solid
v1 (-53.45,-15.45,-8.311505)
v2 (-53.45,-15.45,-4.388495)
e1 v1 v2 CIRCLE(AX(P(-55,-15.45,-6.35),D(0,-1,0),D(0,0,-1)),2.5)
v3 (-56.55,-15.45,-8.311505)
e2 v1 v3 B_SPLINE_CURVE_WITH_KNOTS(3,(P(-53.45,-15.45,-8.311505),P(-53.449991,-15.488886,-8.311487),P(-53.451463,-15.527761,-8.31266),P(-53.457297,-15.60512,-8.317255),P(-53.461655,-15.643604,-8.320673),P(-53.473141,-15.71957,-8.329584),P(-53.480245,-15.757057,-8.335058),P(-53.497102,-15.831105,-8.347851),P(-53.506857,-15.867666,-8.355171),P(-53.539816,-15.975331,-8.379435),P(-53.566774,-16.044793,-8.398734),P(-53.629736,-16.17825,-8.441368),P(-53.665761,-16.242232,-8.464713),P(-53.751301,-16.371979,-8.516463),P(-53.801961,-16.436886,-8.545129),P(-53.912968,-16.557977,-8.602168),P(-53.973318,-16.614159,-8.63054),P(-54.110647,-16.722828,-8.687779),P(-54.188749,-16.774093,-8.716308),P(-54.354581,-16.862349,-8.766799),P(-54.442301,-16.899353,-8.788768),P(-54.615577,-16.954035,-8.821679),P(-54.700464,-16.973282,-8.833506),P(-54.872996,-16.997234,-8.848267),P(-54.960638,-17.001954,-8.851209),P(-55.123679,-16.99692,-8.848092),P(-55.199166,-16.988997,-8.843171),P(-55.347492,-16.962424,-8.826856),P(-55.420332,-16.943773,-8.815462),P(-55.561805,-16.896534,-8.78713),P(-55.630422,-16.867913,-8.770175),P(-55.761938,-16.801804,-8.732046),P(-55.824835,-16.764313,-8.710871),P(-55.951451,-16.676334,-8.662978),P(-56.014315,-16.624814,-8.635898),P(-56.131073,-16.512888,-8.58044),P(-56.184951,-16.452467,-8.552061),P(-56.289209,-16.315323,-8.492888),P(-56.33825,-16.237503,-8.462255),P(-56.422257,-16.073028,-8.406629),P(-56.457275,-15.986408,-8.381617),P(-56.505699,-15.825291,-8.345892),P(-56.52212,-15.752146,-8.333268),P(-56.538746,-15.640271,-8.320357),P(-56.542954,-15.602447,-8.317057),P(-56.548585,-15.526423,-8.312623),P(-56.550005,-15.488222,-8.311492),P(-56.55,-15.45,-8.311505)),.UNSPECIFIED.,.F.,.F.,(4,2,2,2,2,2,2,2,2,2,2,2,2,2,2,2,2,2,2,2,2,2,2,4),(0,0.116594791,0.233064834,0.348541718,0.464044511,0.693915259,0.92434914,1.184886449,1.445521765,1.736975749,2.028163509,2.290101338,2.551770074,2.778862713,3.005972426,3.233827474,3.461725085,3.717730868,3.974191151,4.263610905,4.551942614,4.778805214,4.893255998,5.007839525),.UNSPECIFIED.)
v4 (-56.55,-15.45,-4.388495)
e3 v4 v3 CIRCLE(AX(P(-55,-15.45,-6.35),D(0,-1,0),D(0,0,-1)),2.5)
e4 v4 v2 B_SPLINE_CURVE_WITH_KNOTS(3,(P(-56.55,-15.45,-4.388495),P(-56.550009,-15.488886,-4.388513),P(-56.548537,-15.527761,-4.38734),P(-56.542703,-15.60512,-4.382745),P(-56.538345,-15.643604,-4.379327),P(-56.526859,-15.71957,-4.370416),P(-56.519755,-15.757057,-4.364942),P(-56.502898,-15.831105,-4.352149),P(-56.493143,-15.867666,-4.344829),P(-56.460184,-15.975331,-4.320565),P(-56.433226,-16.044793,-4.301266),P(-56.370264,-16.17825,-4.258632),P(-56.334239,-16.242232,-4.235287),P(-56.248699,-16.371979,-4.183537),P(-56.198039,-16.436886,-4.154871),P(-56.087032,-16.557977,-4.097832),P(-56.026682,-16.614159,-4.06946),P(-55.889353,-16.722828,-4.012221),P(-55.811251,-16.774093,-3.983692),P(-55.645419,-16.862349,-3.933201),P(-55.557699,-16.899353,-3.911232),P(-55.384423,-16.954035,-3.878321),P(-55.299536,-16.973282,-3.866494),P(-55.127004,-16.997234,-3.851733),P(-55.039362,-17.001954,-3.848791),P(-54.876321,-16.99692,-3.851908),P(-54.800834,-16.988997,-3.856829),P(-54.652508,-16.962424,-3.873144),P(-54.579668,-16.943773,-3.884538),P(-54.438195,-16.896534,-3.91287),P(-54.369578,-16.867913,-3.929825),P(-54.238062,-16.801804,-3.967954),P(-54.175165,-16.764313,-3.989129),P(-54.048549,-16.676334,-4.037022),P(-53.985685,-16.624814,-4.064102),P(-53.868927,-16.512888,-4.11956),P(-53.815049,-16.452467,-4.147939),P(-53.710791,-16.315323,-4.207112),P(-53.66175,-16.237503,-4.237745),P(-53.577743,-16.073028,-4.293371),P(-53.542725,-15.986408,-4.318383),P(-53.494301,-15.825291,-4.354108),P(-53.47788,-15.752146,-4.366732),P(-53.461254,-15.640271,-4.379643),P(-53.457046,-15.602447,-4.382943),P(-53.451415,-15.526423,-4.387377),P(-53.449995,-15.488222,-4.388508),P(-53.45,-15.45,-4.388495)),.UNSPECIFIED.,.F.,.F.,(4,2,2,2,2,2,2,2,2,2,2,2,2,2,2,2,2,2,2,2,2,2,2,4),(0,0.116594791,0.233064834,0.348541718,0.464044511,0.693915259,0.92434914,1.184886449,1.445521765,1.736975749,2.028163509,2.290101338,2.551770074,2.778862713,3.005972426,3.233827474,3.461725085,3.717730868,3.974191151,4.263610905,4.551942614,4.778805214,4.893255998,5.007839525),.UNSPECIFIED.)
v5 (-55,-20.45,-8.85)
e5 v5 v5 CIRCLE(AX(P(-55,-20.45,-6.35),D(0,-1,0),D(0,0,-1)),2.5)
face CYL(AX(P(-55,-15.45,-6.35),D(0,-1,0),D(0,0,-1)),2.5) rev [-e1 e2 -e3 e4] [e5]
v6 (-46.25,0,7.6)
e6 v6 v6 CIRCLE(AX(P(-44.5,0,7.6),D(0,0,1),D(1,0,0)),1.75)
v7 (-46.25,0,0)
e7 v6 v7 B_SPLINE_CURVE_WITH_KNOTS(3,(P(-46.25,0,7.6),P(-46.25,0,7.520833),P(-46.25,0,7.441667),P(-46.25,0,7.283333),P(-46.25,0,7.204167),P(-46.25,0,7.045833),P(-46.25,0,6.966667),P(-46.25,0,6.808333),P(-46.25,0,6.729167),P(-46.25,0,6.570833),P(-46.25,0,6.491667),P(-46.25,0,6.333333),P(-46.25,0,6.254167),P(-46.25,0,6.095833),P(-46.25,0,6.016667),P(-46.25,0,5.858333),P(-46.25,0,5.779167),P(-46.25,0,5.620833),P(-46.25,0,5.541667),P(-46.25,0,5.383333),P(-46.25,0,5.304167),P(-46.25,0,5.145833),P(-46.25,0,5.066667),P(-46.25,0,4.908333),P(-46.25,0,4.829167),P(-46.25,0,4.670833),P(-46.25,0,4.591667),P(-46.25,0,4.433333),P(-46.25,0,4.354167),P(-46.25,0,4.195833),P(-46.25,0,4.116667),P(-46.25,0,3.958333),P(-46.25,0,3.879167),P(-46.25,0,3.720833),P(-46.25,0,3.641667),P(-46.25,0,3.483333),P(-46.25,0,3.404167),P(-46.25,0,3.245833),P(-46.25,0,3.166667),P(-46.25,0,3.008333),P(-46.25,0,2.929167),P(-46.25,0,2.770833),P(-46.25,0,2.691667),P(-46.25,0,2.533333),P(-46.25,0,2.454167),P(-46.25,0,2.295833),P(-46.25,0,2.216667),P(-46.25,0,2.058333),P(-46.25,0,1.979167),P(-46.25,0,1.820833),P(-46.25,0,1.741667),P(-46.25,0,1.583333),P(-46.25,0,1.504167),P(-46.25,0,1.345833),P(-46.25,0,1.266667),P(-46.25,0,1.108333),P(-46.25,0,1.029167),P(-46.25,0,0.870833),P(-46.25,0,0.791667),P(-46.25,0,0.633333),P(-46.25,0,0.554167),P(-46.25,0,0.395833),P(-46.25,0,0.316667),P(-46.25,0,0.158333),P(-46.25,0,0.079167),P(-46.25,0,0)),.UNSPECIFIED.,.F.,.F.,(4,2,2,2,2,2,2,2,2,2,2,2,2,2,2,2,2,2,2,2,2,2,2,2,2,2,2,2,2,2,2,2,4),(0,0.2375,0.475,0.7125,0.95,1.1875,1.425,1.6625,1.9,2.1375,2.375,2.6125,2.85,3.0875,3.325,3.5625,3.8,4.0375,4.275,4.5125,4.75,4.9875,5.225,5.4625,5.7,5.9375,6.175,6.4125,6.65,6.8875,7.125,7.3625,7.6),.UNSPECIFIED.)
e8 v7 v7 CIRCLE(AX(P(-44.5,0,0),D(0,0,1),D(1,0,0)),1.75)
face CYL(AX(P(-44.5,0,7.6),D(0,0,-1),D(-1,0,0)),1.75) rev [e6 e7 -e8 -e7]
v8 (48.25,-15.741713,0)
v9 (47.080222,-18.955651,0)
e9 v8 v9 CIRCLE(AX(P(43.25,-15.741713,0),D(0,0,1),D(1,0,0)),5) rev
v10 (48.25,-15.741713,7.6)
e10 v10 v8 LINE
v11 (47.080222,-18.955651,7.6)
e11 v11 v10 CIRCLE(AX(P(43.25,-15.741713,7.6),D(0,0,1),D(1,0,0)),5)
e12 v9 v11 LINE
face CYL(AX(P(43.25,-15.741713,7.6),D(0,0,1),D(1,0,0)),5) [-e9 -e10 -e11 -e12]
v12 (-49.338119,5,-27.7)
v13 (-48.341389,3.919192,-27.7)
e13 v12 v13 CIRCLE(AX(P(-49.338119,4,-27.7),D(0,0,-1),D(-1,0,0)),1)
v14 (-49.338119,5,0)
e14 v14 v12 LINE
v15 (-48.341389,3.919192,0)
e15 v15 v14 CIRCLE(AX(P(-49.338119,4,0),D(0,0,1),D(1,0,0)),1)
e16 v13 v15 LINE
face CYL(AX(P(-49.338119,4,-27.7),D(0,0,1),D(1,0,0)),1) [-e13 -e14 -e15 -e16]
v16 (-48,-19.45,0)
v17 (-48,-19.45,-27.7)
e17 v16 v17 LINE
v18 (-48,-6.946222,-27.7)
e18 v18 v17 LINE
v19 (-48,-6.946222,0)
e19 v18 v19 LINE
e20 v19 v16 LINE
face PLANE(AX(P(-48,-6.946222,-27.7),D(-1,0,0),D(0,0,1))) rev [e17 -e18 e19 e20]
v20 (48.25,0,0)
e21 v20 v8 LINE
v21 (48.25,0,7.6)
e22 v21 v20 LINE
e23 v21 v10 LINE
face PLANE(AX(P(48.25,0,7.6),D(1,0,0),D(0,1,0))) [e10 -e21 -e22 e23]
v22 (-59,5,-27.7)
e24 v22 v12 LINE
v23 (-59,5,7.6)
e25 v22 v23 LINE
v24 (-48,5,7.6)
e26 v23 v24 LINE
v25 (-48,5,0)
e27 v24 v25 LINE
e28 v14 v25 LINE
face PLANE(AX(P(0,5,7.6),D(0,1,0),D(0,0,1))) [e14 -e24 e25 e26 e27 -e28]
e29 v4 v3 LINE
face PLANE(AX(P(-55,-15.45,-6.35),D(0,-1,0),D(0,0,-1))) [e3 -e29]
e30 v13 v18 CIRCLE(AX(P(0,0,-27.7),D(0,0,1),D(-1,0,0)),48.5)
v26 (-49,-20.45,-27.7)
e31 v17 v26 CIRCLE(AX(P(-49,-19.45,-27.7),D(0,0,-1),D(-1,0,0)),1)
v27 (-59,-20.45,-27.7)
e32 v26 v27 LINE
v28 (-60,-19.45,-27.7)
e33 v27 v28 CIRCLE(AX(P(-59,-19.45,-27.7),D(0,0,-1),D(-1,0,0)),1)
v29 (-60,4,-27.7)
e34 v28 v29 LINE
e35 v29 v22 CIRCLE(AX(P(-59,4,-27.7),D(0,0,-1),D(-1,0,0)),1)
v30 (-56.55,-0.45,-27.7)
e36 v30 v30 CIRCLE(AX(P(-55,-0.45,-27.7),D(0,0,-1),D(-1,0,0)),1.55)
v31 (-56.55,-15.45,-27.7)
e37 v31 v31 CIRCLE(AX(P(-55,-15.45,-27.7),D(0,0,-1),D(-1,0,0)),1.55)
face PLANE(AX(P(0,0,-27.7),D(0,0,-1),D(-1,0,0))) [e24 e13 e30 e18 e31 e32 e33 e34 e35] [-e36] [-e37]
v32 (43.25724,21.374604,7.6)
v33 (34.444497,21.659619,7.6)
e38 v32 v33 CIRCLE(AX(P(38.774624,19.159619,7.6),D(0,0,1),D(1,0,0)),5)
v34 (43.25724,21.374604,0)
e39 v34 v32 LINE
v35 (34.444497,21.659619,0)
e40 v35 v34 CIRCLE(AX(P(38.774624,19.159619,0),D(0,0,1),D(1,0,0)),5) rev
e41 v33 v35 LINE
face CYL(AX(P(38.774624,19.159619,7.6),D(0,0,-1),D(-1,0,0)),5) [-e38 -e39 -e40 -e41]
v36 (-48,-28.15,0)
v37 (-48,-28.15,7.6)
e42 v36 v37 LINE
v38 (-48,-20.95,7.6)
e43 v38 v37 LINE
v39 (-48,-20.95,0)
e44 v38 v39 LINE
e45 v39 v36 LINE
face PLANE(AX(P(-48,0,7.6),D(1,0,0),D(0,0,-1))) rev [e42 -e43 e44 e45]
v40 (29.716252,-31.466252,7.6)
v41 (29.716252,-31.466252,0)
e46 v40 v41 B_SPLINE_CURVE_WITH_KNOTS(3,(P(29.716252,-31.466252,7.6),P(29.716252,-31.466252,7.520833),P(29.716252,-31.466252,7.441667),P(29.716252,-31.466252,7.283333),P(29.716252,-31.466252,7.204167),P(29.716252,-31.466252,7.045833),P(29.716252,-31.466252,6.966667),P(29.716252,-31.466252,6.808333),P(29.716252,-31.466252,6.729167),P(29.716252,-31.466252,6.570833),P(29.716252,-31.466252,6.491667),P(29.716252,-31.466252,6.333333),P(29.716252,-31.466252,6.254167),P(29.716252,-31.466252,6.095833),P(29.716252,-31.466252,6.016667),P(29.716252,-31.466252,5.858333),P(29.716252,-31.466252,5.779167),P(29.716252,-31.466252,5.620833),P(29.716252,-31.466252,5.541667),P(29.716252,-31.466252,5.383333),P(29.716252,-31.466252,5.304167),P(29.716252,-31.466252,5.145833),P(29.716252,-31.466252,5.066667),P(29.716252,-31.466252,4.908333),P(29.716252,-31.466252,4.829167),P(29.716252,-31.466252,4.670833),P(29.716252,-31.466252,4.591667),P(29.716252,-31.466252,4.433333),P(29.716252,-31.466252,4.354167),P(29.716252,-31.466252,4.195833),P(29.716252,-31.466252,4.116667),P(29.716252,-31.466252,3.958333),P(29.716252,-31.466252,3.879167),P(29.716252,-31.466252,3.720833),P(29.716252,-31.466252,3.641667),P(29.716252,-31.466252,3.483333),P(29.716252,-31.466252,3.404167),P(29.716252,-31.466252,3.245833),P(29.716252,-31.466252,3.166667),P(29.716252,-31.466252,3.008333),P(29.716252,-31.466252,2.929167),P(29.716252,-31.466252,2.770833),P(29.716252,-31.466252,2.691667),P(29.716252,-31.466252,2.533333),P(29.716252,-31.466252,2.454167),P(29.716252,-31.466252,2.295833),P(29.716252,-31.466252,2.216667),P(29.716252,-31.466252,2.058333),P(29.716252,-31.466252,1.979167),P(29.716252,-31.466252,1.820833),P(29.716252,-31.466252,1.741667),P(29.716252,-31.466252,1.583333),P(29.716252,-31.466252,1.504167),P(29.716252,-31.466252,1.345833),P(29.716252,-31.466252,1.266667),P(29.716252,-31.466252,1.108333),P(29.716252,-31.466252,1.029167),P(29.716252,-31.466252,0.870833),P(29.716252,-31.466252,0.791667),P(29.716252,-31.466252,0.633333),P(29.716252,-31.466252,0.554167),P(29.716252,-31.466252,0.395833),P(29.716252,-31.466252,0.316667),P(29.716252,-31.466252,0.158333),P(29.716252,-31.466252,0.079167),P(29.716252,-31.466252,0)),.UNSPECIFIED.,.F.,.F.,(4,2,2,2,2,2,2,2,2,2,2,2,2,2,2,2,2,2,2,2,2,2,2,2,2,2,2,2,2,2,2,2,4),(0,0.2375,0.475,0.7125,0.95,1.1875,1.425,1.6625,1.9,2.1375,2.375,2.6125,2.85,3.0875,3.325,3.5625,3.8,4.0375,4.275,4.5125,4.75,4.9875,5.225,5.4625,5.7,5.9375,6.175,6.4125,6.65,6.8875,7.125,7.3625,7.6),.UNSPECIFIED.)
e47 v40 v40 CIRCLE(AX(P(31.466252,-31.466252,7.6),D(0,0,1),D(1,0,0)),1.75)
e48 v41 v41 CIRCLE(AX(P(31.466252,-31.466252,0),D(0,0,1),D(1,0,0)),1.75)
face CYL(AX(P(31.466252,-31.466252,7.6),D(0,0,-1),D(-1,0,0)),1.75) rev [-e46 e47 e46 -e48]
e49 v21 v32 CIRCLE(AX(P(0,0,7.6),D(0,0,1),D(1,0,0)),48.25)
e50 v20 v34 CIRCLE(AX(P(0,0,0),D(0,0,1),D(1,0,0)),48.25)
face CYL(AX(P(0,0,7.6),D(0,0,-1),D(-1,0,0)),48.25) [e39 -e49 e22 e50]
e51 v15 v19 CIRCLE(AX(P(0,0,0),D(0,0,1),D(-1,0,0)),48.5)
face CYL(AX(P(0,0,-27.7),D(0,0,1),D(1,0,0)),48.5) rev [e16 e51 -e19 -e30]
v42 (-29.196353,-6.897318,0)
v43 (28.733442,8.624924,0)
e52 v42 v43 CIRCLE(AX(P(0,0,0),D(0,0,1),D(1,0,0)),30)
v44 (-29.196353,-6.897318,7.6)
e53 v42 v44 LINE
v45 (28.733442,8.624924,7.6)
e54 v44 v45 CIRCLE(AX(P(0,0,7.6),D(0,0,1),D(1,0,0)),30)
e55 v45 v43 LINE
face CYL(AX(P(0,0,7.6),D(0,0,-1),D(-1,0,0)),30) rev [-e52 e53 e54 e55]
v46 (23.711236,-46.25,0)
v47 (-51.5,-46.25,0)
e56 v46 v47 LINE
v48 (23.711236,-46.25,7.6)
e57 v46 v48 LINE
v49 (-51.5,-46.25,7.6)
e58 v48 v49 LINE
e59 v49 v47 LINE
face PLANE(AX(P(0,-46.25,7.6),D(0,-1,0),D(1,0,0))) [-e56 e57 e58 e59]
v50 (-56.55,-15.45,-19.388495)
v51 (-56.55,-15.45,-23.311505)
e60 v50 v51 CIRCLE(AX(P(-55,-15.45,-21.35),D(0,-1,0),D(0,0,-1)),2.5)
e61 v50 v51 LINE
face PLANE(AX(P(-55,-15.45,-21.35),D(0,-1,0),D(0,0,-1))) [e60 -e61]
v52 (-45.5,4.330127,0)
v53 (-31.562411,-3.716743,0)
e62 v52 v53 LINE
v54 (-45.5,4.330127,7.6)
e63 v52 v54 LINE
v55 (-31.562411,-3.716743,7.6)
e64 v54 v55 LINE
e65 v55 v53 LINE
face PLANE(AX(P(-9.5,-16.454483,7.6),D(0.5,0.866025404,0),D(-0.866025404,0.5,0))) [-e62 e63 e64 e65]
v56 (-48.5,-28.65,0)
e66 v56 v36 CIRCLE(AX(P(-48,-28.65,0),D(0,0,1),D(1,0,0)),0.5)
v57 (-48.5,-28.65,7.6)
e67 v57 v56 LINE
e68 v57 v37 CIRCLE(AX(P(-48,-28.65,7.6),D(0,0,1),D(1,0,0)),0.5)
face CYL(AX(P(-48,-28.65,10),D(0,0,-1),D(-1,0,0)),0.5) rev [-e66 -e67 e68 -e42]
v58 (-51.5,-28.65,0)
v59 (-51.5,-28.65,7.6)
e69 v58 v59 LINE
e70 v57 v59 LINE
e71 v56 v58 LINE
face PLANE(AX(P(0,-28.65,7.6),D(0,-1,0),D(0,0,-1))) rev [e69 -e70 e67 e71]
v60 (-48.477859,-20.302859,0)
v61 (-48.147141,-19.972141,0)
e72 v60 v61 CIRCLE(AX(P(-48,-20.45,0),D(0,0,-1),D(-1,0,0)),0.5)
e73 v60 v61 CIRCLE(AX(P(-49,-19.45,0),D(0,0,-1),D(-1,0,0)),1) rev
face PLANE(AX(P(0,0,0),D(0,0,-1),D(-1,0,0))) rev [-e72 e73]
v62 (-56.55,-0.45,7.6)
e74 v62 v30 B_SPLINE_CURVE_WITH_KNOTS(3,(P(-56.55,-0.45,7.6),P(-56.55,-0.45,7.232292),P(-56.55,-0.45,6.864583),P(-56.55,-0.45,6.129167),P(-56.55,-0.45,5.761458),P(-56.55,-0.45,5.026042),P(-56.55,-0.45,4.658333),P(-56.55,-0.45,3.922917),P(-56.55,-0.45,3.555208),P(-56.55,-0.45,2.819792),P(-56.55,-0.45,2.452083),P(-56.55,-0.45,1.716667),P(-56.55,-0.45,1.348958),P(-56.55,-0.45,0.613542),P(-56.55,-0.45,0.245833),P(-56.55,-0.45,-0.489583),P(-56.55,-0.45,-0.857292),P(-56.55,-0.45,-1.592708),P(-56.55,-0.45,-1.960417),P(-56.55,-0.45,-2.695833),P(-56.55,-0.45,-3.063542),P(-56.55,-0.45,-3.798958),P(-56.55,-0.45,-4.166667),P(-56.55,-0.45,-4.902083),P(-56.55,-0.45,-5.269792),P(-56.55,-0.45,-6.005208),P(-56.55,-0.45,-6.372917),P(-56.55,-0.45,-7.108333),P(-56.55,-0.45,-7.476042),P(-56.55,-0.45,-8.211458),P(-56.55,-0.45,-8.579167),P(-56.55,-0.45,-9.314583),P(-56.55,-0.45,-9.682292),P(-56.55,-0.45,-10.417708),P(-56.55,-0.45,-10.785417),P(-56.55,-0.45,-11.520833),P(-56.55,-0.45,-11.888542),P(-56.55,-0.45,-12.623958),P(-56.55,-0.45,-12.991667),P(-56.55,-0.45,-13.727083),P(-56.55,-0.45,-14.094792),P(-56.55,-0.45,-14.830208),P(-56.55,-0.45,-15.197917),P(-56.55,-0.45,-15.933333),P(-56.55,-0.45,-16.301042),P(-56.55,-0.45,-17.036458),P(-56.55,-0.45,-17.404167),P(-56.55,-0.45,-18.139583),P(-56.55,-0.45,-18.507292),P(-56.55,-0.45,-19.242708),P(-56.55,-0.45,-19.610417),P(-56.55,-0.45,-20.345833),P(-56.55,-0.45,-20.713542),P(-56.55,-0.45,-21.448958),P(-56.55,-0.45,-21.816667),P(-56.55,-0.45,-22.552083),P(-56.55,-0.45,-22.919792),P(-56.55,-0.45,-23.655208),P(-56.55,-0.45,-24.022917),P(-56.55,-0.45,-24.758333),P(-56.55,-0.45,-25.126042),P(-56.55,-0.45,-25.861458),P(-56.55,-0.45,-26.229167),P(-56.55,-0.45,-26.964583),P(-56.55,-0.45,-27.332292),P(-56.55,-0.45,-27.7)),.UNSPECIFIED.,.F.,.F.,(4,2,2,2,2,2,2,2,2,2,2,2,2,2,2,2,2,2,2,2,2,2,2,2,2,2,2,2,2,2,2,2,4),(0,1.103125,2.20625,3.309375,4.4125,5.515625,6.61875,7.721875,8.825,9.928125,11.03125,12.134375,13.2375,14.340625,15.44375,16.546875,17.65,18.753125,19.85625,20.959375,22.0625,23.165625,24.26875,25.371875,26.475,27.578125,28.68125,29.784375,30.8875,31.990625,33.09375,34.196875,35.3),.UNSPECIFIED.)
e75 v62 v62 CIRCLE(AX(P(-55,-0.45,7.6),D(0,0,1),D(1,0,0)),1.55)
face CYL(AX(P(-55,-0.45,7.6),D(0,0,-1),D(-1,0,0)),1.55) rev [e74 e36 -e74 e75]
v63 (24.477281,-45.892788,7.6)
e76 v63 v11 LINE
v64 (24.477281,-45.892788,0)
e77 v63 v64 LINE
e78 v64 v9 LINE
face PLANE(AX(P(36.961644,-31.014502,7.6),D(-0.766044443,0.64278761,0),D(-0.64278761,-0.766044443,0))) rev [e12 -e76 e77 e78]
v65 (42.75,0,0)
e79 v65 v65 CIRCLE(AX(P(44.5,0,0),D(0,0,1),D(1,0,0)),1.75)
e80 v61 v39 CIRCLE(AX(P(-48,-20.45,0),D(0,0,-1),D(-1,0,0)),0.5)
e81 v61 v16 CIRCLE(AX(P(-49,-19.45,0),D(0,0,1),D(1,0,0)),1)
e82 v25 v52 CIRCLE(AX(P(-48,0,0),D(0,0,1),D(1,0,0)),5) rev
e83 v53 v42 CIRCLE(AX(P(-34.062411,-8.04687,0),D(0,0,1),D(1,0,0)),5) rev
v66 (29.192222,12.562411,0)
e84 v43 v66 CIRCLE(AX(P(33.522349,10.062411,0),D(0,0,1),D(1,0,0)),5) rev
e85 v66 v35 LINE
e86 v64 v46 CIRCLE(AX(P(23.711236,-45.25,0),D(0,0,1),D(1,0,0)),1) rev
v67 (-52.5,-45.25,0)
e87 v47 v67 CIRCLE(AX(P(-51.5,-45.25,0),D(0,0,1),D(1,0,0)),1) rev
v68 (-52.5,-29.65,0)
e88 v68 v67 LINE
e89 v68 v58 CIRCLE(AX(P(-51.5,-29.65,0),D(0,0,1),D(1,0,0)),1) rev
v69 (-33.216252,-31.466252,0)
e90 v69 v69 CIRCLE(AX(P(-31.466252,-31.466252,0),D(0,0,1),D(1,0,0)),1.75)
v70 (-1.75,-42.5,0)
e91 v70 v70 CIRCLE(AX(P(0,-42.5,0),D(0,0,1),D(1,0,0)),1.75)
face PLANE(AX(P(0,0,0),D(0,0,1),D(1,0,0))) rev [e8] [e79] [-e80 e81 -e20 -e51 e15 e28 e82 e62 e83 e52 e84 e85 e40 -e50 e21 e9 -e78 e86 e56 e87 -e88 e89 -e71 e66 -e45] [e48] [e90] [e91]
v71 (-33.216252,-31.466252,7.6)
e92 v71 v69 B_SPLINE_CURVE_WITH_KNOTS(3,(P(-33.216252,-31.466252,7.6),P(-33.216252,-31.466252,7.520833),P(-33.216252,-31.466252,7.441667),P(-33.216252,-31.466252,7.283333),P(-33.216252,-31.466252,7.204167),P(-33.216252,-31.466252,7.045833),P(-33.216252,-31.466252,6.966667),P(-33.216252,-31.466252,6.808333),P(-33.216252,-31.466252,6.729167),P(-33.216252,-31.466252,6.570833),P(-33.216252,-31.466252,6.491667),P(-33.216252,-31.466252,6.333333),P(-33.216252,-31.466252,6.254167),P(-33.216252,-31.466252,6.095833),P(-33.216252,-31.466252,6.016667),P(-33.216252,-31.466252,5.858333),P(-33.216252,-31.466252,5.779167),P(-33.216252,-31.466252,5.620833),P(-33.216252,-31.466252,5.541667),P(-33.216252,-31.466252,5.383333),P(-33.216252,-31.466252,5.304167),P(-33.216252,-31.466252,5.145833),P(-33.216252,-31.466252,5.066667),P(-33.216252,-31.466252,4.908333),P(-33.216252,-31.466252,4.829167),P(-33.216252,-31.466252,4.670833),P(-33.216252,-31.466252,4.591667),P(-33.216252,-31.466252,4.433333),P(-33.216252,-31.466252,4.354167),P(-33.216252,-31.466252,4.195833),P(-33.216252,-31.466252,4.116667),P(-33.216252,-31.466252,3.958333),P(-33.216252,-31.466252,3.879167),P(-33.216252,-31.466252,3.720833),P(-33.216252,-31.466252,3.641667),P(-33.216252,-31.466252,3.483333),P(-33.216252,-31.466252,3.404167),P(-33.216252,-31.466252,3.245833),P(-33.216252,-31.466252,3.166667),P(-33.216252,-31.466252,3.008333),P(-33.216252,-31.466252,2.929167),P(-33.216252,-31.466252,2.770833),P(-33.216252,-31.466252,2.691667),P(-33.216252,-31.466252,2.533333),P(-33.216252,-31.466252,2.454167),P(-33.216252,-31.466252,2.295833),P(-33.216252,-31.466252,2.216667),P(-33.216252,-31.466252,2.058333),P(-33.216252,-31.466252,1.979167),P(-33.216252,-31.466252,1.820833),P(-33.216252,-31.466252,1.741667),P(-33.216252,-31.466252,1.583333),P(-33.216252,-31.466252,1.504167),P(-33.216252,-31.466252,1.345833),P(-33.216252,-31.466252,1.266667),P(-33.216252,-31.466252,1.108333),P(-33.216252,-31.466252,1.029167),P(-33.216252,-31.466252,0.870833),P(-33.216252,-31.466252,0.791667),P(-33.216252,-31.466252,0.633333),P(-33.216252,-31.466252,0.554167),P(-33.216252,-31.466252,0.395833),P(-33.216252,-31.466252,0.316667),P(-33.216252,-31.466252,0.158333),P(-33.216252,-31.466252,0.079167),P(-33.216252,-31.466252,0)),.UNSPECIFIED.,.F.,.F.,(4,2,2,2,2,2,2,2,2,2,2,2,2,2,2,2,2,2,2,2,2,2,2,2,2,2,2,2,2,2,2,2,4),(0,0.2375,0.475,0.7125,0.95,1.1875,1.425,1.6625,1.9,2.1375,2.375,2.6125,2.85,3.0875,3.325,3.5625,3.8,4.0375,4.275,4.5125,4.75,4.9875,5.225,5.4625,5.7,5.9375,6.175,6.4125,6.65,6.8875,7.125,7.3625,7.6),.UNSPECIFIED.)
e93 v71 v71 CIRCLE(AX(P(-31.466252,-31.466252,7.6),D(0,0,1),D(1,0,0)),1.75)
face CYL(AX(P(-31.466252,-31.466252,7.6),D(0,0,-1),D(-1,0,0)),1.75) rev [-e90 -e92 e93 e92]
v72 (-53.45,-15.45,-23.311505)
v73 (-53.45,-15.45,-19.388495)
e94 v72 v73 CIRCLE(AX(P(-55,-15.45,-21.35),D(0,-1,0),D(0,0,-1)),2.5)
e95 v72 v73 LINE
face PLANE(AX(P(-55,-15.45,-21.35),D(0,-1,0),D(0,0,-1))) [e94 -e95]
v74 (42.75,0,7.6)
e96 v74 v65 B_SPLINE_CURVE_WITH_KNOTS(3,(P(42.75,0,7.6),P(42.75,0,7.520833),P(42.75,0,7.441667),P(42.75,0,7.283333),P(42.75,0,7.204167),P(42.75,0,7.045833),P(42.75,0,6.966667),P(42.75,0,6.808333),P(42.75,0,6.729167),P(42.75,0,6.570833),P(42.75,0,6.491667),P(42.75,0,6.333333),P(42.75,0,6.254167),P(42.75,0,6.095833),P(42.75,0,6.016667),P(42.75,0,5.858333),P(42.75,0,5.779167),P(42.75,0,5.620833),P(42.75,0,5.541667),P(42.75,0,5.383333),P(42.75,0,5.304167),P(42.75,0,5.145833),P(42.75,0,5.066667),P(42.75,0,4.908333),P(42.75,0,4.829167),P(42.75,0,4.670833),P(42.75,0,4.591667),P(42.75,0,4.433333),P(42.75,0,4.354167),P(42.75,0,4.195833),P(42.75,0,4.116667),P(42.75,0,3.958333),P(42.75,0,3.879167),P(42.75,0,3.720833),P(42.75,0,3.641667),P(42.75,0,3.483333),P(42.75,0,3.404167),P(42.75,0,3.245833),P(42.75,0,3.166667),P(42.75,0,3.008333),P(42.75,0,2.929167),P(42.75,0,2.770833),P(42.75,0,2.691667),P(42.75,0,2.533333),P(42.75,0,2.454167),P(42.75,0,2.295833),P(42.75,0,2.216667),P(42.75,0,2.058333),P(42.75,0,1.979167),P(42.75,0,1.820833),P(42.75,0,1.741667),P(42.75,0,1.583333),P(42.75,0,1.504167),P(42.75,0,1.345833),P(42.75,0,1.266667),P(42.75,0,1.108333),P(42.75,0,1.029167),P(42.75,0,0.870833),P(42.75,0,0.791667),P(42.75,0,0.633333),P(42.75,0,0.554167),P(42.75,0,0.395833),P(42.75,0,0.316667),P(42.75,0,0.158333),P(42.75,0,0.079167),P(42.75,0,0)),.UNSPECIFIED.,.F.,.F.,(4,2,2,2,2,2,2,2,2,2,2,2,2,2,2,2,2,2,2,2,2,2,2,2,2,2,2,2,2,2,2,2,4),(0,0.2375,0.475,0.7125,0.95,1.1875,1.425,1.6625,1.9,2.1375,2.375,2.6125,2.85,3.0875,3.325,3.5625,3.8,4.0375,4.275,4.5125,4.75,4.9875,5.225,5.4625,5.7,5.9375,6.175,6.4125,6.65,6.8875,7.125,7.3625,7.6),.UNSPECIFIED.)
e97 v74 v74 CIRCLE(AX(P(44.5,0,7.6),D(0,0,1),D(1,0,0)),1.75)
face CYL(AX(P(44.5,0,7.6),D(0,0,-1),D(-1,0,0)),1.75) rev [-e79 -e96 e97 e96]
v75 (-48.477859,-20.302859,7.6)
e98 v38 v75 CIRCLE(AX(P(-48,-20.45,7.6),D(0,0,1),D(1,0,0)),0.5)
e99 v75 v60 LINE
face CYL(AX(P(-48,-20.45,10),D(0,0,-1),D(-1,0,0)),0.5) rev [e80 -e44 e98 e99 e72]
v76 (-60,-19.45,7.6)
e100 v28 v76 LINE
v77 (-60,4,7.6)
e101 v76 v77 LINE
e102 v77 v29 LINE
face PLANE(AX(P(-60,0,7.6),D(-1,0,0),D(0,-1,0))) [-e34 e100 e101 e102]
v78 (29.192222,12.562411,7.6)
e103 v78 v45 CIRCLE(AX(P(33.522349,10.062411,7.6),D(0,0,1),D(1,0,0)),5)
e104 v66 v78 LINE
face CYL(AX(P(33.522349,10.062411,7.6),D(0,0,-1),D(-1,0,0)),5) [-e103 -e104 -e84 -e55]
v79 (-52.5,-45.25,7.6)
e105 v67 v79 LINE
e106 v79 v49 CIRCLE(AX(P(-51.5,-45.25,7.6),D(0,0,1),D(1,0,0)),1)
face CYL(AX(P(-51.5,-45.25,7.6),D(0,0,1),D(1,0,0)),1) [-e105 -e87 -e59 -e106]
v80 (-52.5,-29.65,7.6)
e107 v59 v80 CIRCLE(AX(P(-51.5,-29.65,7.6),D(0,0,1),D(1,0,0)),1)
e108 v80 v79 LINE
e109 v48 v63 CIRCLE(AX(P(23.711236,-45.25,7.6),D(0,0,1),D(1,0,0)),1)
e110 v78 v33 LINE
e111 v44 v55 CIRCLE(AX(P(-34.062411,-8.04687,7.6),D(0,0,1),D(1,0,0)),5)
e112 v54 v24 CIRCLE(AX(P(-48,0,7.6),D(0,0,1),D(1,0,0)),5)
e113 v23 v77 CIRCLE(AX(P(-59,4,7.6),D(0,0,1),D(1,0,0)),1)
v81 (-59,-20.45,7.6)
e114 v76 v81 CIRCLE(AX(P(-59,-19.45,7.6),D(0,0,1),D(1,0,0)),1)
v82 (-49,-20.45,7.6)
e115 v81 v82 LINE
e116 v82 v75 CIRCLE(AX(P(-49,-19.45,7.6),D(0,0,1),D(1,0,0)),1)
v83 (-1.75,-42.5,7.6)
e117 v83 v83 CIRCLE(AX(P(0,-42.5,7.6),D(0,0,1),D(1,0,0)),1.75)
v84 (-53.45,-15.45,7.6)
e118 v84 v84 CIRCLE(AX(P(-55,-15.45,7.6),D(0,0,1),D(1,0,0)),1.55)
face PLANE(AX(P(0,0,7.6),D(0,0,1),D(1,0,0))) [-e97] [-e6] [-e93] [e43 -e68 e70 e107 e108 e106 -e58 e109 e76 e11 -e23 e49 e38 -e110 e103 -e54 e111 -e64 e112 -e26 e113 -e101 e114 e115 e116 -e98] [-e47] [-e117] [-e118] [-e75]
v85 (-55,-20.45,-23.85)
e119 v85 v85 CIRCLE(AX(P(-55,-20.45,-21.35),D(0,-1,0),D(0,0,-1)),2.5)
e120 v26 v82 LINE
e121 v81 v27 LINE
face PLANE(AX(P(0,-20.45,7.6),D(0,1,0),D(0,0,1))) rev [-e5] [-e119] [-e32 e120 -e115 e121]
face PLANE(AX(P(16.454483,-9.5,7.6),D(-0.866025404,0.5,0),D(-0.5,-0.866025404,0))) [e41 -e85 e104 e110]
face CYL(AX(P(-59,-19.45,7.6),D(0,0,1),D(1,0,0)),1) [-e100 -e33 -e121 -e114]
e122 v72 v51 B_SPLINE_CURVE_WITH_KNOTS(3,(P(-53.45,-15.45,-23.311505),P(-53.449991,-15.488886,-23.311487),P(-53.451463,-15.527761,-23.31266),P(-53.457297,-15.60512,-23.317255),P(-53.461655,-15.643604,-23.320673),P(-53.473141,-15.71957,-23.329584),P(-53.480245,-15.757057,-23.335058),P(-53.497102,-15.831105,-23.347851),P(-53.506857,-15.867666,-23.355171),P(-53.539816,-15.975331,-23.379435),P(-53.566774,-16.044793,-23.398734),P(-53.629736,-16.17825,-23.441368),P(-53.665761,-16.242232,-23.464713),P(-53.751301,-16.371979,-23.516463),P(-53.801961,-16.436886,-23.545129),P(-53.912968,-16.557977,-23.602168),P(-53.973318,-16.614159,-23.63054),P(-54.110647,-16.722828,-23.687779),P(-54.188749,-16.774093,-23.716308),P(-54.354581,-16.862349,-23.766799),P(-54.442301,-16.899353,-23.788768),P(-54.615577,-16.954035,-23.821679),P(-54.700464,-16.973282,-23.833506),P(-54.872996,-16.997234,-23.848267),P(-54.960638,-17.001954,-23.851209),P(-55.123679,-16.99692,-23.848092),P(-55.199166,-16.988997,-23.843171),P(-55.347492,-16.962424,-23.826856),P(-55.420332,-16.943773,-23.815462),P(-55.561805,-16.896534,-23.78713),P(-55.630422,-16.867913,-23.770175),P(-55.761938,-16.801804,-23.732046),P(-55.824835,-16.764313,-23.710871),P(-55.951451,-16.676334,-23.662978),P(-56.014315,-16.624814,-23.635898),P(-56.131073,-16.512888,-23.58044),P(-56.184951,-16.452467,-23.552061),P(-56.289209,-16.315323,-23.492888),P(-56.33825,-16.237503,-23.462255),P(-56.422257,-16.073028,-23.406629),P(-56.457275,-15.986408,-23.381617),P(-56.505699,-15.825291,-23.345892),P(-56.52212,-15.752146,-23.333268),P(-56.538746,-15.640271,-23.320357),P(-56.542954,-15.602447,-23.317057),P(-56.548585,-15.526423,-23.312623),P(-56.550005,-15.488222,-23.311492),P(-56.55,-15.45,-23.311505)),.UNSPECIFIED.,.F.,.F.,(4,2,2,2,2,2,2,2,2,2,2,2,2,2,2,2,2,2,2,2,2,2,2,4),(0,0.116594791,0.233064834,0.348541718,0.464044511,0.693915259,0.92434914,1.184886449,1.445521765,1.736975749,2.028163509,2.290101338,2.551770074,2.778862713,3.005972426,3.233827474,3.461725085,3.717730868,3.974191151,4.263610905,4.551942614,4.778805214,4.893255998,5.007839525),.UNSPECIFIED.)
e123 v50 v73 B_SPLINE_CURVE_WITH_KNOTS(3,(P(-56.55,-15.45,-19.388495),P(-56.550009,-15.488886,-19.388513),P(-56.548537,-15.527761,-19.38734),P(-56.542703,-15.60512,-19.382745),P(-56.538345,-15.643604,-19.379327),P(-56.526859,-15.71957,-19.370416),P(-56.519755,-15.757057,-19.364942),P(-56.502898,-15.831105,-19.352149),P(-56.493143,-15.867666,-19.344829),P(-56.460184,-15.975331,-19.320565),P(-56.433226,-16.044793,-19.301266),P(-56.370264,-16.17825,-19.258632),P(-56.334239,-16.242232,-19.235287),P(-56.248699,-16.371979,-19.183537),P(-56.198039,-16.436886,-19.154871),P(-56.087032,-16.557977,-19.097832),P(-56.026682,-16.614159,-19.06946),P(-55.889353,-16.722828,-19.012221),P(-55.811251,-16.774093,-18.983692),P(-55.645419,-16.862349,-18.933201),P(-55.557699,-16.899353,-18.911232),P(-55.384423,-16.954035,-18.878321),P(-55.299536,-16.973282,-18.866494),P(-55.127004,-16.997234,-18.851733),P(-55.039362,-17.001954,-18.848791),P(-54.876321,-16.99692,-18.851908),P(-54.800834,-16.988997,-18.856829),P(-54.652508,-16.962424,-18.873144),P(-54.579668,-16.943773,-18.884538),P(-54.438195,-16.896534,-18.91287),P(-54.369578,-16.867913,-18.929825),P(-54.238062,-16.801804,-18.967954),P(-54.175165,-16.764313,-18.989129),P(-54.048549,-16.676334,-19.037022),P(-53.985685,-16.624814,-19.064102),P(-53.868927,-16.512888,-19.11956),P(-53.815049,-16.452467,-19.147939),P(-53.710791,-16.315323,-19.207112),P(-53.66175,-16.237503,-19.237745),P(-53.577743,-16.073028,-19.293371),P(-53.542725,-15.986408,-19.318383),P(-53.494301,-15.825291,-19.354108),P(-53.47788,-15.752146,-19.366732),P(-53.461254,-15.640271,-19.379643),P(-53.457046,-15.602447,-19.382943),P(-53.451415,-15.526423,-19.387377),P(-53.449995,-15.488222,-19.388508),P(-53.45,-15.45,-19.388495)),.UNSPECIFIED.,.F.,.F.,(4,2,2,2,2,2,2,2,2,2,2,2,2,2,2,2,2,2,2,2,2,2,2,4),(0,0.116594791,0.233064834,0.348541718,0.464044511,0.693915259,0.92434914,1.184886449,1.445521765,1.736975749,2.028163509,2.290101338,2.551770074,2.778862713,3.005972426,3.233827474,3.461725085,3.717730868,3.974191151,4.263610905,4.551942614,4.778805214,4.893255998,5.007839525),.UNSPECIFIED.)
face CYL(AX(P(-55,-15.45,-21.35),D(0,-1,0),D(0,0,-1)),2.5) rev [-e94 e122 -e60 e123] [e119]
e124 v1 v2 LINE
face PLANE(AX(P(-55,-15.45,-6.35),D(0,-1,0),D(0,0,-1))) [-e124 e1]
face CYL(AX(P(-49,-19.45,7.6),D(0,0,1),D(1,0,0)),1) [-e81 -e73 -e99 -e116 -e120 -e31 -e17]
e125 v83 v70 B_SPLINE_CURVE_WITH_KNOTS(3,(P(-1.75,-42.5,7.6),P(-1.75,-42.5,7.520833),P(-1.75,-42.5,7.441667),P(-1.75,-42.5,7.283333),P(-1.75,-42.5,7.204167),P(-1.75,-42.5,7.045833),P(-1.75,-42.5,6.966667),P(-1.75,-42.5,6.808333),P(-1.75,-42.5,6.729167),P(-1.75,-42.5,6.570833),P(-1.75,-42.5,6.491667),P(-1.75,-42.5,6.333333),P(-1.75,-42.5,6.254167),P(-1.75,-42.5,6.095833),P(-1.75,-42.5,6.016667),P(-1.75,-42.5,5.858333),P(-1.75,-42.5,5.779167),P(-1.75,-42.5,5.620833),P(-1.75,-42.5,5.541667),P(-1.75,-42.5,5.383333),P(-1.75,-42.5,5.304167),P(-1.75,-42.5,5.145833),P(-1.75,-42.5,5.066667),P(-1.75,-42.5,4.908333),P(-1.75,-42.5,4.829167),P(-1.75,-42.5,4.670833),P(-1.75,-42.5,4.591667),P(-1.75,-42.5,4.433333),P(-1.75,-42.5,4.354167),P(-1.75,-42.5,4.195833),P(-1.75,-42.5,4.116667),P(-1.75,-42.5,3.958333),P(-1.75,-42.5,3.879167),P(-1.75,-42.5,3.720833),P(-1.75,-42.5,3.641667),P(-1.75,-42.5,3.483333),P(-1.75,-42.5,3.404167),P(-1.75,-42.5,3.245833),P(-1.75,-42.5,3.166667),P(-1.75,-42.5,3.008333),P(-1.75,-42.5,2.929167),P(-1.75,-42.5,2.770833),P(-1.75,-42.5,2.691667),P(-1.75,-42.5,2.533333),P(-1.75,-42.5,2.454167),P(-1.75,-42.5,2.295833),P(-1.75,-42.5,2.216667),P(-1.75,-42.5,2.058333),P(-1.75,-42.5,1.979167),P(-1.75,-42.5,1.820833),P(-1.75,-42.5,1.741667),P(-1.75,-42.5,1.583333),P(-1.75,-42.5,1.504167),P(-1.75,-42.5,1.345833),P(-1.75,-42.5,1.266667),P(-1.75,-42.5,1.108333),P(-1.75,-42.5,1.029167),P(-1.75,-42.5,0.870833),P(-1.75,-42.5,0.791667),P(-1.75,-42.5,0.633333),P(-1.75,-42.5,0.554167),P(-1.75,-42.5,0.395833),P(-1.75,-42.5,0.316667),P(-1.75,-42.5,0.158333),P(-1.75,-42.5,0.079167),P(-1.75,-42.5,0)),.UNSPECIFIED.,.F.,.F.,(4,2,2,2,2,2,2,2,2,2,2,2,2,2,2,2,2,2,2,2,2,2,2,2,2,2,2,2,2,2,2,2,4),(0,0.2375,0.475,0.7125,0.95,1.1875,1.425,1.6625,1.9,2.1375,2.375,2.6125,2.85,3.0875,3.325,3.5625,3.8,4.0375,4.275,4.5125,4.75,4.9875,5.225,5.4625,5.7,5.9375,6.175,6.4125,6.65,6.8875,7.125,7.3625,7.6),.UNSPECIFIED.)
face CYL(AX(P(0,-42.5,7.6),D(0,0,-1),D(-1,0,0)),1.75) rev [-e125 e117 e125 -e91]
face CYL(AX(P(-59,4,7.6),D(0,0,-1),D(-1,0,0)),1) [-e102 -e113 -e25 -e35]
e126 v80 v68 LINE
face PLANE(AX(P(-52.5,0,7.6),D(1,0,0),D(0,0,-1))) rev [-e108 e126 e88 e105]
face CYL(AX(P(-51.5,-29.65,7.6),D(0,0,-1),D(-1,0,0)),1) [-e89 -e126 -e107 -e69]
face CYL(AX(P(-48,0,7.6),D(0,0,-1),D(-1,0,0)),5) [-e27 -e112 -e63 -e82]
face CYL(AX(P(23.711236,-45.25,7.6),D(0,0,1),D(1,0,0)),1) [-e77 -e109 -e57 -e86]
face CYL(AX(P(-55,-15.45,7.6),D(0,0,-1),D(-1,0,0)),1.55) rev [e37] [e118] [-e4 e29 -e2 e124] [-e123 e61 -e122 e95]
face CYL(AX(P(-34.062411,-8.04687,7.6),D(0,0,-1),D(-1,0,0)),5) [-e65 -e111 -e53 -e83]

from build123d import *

# Parameters (mm, degrees)
SKETCH_1_R          = 1.75
SKETCH_1_R_2        = 1.55
EXTRUDE_1_DEPTH     = 7.6
SKETCH_2_R          = 0.5
CUT_EXTRUDE_1_DEPTH = 10
FILLET_1_R          = 5
EXTRUDE_START       = 27.7
SKETCH_4_R          = 1.55
EXTRUDE_2_DEPTH     = 27.7
SKETCH_6_R          = 2.5
CUT_EXTRUDE_2_DEPTH = 5
FILLET_START        = -29
FILLET_2_DEPTH      = 29
FILLET_2_2_DEPTH    = 9


with BuildPart() as part:
    # 草图1 → 凸台-拉伸1 (new body)
    with BuildSketch(Plane.XY):
        with BuildLine():
            Line((48.25, -17.561563803), (48.25, 0))
            ThreePointArc((48.25, 0), (45.781945765, 15.234038926), (38.630271835, 28.909593528))
            Line((38.630271835, 28.909593528), (28.062669438, 10.605969263))
            ThreePointArc((28.062669438, 10.605969263), (7.764571353, -28.977774789), (-29.605969263, -4.846295906))
            Line((-29.605969263, -4.846295906), (-46.660254038, 5))
            Line((-46.660254038, 5), (-60, 5))
            Line((-60, 5), (-60, -20.45))
            Line((-60, -20.45), (-48, -20.45))
            Line((-48, -20.45), (-48, -28.65))
            Line((-48, -28.65), (-52.5, -28.65))
            Line((-52.5, -28.65), (-52.5, -46.25))
            Line((-52.5, -46.25), (24.177543768, -46.25))
            Line((24.177543768, -46.25), (48.25, -17.561563803))
        make_face()
        with Locations(Location((-31.466251763, -31.466251763, 0), (0, 0, 180))):
            Circle(SKETCH_1_R, mode=Mode.SUBTRACT)
        with Locations(Location((-55, -15.45, 0), (0, 0, 180))):
            Circle(SKETCH_1_R_2, mode=Mode.SUBTRACT)
        with Locations(Location((0, -42.5, 0), (0, 0, 180))):
            Circle(SKETCH_1_R, mode=Mode.SUBTRACT)
        with Locations(Location((31.466251763, -31.466251763, 0), (0, 0, 180))):
            Circle(SKETCH_1_R, mode=Mode.SUBTRACT)
        with Locations(Location((-55, -0.45, 0), (0, 0, 180))):
            Circle(SKETCH_1_R_2, mode=Mode.SUBTRACT)
        with Locations(Location((-44.5, 0, 0), (0, 0, 180))):
            Circle(SKETCH_1_R, mode=Mode.SUBTRACT)
        with Locations(Location((44.5, 0, 0), (0, 0, 180))):
            Circle(SKETCH_1_R, mode=Mode.SUBTRACT)
    extrude(amount=EXTRUDE_1_DEPTH)

    # 草图2 → 切除-拉伸1 (cut)
    with BuildSketch(Plane(origin=(0, 0, 0), x_dir=(-1, 0, 0), z_dir=(0, 0, -1))):
        with Locations((48, -20.45)):
            Circle(SKETCH_2_R)
        with Locations((48, -28.65)):
            Circle(SKETCH_2_R)
    extrude(amount=-CUT_EXTRUDE_1_DEPTH, mode=Mode.SUBTRACT)

    # 圆角1
    fillet_1_edges = [part.edges().sort_by_distance(p)[0] for p in [
        (48.25, -17.561563803, 3.8),
        (-46.660254038, 5, 3.8),
        (-29.605969263, -4.846295906, 3.8),
        (28.062669438, 10.605969263, 3.8),
        (38.630271835, 28.909593528, 3.8),
    ]]
    fillet(fillet_1_edges, radius=FILLET_1_R)

    # 草图4 → 凸台-拉伸2 (add)
    with BuildSketch(Plane(origin=(0, 0, 0), x_dir=(-1, 0, 0), z_dir=(0, 0, -1)).offset(EXTRUDE_START)):
        with BuildLine():
            Line((60, 5), (48.241579576, 5))
            ThreePointArc((48.241579576, 5), (48.490086253, -0.980579006), (48, -6.946221995))
            Line((48, -6.946221995), (48, -20.45))
            Line((48, -20.45), (60, -20.45))
            Line((60, -20.45), (60, 5))
        make_face()
        with Locations((55, -15.45)):
            Circle(SKETCH_4_R, mode=Mode.SUBTRACT)
        with Locations((55, -0.45)):
            Circle(SKETCH_4_R, mode=Mode.SUBTRACT)
    extrude(amount=-EXTRUDE_2_DEPTH)

    # 草图6 → 切除-拉伸2 (cut)
    with BuildSketch(Plane.XZ.offset(20.45)):
        with Locations(Location((-55, -21.35, 0), (0, 0, 270))):
            Circle(SKETCH_6_R)
        with Locations(Location((-55, -6.35, 0), (0, 0, 270))):
            Circle(SKETCH_6_R)
    extrude(amount=-CUT_EXTRUDE_2_DEPTH, mode=Mode.SUBTRACT)

    # 圆角2: read off the stored shape, not the designer's step
    # 圆角2 outline → 圆角2 (cut)
    with BuildSketch(Plane.XY.offset(FILLET_START)):
        with BuildLine():
            Line((-49, -20.45), (-48, -20.45))
            Line((-48, -20.45), (-48, -19.45))
            ThreePointArc((-48, -19.45), (-48.292893219, -20.157106781), (-49, -20.45))
        make_face()
        with BuildLine():
            Line((-60, -20.45), (-59, -20.45))
            ThreePointArc((-59, -20.45), (-59.707106781, -20.157106781), (-60, -19.45))
            Line((-60, -19.45), (-60, -20.45))
        make_face()
        with BuildLine():
            Line((-60, 5), (-60, 4))
            ThreePointArc((-60, 4), (-59.707106781, 4.707106781), (-59, 5))
            Line((-59, 5), (-60, 5))
        make_face()
        with BuildLine():
            ThreePointArc((-49.338119137, 5), (-48.602997351, 4.67793507), (-48.341389458, 3.919191919))
            ThreePointArc((-48.341389458, 3.919191919), (-48.294508108, 4.45987518), (-48.241579576, 5))
            Line((-48.241579576, 5), (-49.338119137, 5))
        make_face()
    extrude(amount=FILLET_2_DEPTH, mode=Mode.SUBTRACT)

    # Fillet 2 2 outline → Fillet 2 2 (cut)
    with BuildSketch(Plane.XY):
        with BuildLine():
            ThreePointArc((-48.477859457, -20.302859457), (-48.728761597, -20.412512196), (-49, -20.45))
            Line((-49, -20.45), (-48.5, -20.45))
            ThreePointArc((-48.5, -20.45), (-48.494433883, -20.375601507), (-48.477859457, -20.302859457))
        make_face()
        with BuildLine():
            Line((-60, -20.45), (-59, -20.45))
            ThreePointArc((-59, -20.45), (-59.707106781, -20.157106781), (-60, -19.45))
            Line((-60, -19.45), (-60, -20.45))
        make_face()
        with BuildLine():
            Line((-60, 5), (-60, 4))
            ThreePointArc((-60, 4), (-59.707106781, 4.707106781), (-59, 5))
            Line((-59, 5), (-60, 5))
        make_face()
        with BuildLine():
            Line((-52.5, -28.65), (-52.5, -29.65))
            ThreePointArc((-52.5, -29.65), (-52.207106781, -28.942893219), (-51.5, -28.65))
            Line((-51.5, -28.65), (-52.5, -28.65))
        make_face()
        with BuildLine():
            Line((-52.5, -46.25), (-51.5, -46.25))
            ThreePointArc((-51.5, -46.25), (-52.207106781, -45.957106781), (-52.5, -45.25))
            Line((-52.5, -45.25), (-52.5, -46.25))
        make_face()
        with BuildLine():
            ThreePointArc((24.477280553, -45.89278761), (24.133854372, -46.156307787), (23.71123611, -46.25))
            Line((23.71123611, -46.25), (24.177543768, -46.25))
            Line((24.177543768, -46.25), (24.477280553, -45.89278761))
        make_face()
    extrude(amount=FILLET_2_2_DEPTH, mode=Mode.SUBTRACT)


solid = part.part
